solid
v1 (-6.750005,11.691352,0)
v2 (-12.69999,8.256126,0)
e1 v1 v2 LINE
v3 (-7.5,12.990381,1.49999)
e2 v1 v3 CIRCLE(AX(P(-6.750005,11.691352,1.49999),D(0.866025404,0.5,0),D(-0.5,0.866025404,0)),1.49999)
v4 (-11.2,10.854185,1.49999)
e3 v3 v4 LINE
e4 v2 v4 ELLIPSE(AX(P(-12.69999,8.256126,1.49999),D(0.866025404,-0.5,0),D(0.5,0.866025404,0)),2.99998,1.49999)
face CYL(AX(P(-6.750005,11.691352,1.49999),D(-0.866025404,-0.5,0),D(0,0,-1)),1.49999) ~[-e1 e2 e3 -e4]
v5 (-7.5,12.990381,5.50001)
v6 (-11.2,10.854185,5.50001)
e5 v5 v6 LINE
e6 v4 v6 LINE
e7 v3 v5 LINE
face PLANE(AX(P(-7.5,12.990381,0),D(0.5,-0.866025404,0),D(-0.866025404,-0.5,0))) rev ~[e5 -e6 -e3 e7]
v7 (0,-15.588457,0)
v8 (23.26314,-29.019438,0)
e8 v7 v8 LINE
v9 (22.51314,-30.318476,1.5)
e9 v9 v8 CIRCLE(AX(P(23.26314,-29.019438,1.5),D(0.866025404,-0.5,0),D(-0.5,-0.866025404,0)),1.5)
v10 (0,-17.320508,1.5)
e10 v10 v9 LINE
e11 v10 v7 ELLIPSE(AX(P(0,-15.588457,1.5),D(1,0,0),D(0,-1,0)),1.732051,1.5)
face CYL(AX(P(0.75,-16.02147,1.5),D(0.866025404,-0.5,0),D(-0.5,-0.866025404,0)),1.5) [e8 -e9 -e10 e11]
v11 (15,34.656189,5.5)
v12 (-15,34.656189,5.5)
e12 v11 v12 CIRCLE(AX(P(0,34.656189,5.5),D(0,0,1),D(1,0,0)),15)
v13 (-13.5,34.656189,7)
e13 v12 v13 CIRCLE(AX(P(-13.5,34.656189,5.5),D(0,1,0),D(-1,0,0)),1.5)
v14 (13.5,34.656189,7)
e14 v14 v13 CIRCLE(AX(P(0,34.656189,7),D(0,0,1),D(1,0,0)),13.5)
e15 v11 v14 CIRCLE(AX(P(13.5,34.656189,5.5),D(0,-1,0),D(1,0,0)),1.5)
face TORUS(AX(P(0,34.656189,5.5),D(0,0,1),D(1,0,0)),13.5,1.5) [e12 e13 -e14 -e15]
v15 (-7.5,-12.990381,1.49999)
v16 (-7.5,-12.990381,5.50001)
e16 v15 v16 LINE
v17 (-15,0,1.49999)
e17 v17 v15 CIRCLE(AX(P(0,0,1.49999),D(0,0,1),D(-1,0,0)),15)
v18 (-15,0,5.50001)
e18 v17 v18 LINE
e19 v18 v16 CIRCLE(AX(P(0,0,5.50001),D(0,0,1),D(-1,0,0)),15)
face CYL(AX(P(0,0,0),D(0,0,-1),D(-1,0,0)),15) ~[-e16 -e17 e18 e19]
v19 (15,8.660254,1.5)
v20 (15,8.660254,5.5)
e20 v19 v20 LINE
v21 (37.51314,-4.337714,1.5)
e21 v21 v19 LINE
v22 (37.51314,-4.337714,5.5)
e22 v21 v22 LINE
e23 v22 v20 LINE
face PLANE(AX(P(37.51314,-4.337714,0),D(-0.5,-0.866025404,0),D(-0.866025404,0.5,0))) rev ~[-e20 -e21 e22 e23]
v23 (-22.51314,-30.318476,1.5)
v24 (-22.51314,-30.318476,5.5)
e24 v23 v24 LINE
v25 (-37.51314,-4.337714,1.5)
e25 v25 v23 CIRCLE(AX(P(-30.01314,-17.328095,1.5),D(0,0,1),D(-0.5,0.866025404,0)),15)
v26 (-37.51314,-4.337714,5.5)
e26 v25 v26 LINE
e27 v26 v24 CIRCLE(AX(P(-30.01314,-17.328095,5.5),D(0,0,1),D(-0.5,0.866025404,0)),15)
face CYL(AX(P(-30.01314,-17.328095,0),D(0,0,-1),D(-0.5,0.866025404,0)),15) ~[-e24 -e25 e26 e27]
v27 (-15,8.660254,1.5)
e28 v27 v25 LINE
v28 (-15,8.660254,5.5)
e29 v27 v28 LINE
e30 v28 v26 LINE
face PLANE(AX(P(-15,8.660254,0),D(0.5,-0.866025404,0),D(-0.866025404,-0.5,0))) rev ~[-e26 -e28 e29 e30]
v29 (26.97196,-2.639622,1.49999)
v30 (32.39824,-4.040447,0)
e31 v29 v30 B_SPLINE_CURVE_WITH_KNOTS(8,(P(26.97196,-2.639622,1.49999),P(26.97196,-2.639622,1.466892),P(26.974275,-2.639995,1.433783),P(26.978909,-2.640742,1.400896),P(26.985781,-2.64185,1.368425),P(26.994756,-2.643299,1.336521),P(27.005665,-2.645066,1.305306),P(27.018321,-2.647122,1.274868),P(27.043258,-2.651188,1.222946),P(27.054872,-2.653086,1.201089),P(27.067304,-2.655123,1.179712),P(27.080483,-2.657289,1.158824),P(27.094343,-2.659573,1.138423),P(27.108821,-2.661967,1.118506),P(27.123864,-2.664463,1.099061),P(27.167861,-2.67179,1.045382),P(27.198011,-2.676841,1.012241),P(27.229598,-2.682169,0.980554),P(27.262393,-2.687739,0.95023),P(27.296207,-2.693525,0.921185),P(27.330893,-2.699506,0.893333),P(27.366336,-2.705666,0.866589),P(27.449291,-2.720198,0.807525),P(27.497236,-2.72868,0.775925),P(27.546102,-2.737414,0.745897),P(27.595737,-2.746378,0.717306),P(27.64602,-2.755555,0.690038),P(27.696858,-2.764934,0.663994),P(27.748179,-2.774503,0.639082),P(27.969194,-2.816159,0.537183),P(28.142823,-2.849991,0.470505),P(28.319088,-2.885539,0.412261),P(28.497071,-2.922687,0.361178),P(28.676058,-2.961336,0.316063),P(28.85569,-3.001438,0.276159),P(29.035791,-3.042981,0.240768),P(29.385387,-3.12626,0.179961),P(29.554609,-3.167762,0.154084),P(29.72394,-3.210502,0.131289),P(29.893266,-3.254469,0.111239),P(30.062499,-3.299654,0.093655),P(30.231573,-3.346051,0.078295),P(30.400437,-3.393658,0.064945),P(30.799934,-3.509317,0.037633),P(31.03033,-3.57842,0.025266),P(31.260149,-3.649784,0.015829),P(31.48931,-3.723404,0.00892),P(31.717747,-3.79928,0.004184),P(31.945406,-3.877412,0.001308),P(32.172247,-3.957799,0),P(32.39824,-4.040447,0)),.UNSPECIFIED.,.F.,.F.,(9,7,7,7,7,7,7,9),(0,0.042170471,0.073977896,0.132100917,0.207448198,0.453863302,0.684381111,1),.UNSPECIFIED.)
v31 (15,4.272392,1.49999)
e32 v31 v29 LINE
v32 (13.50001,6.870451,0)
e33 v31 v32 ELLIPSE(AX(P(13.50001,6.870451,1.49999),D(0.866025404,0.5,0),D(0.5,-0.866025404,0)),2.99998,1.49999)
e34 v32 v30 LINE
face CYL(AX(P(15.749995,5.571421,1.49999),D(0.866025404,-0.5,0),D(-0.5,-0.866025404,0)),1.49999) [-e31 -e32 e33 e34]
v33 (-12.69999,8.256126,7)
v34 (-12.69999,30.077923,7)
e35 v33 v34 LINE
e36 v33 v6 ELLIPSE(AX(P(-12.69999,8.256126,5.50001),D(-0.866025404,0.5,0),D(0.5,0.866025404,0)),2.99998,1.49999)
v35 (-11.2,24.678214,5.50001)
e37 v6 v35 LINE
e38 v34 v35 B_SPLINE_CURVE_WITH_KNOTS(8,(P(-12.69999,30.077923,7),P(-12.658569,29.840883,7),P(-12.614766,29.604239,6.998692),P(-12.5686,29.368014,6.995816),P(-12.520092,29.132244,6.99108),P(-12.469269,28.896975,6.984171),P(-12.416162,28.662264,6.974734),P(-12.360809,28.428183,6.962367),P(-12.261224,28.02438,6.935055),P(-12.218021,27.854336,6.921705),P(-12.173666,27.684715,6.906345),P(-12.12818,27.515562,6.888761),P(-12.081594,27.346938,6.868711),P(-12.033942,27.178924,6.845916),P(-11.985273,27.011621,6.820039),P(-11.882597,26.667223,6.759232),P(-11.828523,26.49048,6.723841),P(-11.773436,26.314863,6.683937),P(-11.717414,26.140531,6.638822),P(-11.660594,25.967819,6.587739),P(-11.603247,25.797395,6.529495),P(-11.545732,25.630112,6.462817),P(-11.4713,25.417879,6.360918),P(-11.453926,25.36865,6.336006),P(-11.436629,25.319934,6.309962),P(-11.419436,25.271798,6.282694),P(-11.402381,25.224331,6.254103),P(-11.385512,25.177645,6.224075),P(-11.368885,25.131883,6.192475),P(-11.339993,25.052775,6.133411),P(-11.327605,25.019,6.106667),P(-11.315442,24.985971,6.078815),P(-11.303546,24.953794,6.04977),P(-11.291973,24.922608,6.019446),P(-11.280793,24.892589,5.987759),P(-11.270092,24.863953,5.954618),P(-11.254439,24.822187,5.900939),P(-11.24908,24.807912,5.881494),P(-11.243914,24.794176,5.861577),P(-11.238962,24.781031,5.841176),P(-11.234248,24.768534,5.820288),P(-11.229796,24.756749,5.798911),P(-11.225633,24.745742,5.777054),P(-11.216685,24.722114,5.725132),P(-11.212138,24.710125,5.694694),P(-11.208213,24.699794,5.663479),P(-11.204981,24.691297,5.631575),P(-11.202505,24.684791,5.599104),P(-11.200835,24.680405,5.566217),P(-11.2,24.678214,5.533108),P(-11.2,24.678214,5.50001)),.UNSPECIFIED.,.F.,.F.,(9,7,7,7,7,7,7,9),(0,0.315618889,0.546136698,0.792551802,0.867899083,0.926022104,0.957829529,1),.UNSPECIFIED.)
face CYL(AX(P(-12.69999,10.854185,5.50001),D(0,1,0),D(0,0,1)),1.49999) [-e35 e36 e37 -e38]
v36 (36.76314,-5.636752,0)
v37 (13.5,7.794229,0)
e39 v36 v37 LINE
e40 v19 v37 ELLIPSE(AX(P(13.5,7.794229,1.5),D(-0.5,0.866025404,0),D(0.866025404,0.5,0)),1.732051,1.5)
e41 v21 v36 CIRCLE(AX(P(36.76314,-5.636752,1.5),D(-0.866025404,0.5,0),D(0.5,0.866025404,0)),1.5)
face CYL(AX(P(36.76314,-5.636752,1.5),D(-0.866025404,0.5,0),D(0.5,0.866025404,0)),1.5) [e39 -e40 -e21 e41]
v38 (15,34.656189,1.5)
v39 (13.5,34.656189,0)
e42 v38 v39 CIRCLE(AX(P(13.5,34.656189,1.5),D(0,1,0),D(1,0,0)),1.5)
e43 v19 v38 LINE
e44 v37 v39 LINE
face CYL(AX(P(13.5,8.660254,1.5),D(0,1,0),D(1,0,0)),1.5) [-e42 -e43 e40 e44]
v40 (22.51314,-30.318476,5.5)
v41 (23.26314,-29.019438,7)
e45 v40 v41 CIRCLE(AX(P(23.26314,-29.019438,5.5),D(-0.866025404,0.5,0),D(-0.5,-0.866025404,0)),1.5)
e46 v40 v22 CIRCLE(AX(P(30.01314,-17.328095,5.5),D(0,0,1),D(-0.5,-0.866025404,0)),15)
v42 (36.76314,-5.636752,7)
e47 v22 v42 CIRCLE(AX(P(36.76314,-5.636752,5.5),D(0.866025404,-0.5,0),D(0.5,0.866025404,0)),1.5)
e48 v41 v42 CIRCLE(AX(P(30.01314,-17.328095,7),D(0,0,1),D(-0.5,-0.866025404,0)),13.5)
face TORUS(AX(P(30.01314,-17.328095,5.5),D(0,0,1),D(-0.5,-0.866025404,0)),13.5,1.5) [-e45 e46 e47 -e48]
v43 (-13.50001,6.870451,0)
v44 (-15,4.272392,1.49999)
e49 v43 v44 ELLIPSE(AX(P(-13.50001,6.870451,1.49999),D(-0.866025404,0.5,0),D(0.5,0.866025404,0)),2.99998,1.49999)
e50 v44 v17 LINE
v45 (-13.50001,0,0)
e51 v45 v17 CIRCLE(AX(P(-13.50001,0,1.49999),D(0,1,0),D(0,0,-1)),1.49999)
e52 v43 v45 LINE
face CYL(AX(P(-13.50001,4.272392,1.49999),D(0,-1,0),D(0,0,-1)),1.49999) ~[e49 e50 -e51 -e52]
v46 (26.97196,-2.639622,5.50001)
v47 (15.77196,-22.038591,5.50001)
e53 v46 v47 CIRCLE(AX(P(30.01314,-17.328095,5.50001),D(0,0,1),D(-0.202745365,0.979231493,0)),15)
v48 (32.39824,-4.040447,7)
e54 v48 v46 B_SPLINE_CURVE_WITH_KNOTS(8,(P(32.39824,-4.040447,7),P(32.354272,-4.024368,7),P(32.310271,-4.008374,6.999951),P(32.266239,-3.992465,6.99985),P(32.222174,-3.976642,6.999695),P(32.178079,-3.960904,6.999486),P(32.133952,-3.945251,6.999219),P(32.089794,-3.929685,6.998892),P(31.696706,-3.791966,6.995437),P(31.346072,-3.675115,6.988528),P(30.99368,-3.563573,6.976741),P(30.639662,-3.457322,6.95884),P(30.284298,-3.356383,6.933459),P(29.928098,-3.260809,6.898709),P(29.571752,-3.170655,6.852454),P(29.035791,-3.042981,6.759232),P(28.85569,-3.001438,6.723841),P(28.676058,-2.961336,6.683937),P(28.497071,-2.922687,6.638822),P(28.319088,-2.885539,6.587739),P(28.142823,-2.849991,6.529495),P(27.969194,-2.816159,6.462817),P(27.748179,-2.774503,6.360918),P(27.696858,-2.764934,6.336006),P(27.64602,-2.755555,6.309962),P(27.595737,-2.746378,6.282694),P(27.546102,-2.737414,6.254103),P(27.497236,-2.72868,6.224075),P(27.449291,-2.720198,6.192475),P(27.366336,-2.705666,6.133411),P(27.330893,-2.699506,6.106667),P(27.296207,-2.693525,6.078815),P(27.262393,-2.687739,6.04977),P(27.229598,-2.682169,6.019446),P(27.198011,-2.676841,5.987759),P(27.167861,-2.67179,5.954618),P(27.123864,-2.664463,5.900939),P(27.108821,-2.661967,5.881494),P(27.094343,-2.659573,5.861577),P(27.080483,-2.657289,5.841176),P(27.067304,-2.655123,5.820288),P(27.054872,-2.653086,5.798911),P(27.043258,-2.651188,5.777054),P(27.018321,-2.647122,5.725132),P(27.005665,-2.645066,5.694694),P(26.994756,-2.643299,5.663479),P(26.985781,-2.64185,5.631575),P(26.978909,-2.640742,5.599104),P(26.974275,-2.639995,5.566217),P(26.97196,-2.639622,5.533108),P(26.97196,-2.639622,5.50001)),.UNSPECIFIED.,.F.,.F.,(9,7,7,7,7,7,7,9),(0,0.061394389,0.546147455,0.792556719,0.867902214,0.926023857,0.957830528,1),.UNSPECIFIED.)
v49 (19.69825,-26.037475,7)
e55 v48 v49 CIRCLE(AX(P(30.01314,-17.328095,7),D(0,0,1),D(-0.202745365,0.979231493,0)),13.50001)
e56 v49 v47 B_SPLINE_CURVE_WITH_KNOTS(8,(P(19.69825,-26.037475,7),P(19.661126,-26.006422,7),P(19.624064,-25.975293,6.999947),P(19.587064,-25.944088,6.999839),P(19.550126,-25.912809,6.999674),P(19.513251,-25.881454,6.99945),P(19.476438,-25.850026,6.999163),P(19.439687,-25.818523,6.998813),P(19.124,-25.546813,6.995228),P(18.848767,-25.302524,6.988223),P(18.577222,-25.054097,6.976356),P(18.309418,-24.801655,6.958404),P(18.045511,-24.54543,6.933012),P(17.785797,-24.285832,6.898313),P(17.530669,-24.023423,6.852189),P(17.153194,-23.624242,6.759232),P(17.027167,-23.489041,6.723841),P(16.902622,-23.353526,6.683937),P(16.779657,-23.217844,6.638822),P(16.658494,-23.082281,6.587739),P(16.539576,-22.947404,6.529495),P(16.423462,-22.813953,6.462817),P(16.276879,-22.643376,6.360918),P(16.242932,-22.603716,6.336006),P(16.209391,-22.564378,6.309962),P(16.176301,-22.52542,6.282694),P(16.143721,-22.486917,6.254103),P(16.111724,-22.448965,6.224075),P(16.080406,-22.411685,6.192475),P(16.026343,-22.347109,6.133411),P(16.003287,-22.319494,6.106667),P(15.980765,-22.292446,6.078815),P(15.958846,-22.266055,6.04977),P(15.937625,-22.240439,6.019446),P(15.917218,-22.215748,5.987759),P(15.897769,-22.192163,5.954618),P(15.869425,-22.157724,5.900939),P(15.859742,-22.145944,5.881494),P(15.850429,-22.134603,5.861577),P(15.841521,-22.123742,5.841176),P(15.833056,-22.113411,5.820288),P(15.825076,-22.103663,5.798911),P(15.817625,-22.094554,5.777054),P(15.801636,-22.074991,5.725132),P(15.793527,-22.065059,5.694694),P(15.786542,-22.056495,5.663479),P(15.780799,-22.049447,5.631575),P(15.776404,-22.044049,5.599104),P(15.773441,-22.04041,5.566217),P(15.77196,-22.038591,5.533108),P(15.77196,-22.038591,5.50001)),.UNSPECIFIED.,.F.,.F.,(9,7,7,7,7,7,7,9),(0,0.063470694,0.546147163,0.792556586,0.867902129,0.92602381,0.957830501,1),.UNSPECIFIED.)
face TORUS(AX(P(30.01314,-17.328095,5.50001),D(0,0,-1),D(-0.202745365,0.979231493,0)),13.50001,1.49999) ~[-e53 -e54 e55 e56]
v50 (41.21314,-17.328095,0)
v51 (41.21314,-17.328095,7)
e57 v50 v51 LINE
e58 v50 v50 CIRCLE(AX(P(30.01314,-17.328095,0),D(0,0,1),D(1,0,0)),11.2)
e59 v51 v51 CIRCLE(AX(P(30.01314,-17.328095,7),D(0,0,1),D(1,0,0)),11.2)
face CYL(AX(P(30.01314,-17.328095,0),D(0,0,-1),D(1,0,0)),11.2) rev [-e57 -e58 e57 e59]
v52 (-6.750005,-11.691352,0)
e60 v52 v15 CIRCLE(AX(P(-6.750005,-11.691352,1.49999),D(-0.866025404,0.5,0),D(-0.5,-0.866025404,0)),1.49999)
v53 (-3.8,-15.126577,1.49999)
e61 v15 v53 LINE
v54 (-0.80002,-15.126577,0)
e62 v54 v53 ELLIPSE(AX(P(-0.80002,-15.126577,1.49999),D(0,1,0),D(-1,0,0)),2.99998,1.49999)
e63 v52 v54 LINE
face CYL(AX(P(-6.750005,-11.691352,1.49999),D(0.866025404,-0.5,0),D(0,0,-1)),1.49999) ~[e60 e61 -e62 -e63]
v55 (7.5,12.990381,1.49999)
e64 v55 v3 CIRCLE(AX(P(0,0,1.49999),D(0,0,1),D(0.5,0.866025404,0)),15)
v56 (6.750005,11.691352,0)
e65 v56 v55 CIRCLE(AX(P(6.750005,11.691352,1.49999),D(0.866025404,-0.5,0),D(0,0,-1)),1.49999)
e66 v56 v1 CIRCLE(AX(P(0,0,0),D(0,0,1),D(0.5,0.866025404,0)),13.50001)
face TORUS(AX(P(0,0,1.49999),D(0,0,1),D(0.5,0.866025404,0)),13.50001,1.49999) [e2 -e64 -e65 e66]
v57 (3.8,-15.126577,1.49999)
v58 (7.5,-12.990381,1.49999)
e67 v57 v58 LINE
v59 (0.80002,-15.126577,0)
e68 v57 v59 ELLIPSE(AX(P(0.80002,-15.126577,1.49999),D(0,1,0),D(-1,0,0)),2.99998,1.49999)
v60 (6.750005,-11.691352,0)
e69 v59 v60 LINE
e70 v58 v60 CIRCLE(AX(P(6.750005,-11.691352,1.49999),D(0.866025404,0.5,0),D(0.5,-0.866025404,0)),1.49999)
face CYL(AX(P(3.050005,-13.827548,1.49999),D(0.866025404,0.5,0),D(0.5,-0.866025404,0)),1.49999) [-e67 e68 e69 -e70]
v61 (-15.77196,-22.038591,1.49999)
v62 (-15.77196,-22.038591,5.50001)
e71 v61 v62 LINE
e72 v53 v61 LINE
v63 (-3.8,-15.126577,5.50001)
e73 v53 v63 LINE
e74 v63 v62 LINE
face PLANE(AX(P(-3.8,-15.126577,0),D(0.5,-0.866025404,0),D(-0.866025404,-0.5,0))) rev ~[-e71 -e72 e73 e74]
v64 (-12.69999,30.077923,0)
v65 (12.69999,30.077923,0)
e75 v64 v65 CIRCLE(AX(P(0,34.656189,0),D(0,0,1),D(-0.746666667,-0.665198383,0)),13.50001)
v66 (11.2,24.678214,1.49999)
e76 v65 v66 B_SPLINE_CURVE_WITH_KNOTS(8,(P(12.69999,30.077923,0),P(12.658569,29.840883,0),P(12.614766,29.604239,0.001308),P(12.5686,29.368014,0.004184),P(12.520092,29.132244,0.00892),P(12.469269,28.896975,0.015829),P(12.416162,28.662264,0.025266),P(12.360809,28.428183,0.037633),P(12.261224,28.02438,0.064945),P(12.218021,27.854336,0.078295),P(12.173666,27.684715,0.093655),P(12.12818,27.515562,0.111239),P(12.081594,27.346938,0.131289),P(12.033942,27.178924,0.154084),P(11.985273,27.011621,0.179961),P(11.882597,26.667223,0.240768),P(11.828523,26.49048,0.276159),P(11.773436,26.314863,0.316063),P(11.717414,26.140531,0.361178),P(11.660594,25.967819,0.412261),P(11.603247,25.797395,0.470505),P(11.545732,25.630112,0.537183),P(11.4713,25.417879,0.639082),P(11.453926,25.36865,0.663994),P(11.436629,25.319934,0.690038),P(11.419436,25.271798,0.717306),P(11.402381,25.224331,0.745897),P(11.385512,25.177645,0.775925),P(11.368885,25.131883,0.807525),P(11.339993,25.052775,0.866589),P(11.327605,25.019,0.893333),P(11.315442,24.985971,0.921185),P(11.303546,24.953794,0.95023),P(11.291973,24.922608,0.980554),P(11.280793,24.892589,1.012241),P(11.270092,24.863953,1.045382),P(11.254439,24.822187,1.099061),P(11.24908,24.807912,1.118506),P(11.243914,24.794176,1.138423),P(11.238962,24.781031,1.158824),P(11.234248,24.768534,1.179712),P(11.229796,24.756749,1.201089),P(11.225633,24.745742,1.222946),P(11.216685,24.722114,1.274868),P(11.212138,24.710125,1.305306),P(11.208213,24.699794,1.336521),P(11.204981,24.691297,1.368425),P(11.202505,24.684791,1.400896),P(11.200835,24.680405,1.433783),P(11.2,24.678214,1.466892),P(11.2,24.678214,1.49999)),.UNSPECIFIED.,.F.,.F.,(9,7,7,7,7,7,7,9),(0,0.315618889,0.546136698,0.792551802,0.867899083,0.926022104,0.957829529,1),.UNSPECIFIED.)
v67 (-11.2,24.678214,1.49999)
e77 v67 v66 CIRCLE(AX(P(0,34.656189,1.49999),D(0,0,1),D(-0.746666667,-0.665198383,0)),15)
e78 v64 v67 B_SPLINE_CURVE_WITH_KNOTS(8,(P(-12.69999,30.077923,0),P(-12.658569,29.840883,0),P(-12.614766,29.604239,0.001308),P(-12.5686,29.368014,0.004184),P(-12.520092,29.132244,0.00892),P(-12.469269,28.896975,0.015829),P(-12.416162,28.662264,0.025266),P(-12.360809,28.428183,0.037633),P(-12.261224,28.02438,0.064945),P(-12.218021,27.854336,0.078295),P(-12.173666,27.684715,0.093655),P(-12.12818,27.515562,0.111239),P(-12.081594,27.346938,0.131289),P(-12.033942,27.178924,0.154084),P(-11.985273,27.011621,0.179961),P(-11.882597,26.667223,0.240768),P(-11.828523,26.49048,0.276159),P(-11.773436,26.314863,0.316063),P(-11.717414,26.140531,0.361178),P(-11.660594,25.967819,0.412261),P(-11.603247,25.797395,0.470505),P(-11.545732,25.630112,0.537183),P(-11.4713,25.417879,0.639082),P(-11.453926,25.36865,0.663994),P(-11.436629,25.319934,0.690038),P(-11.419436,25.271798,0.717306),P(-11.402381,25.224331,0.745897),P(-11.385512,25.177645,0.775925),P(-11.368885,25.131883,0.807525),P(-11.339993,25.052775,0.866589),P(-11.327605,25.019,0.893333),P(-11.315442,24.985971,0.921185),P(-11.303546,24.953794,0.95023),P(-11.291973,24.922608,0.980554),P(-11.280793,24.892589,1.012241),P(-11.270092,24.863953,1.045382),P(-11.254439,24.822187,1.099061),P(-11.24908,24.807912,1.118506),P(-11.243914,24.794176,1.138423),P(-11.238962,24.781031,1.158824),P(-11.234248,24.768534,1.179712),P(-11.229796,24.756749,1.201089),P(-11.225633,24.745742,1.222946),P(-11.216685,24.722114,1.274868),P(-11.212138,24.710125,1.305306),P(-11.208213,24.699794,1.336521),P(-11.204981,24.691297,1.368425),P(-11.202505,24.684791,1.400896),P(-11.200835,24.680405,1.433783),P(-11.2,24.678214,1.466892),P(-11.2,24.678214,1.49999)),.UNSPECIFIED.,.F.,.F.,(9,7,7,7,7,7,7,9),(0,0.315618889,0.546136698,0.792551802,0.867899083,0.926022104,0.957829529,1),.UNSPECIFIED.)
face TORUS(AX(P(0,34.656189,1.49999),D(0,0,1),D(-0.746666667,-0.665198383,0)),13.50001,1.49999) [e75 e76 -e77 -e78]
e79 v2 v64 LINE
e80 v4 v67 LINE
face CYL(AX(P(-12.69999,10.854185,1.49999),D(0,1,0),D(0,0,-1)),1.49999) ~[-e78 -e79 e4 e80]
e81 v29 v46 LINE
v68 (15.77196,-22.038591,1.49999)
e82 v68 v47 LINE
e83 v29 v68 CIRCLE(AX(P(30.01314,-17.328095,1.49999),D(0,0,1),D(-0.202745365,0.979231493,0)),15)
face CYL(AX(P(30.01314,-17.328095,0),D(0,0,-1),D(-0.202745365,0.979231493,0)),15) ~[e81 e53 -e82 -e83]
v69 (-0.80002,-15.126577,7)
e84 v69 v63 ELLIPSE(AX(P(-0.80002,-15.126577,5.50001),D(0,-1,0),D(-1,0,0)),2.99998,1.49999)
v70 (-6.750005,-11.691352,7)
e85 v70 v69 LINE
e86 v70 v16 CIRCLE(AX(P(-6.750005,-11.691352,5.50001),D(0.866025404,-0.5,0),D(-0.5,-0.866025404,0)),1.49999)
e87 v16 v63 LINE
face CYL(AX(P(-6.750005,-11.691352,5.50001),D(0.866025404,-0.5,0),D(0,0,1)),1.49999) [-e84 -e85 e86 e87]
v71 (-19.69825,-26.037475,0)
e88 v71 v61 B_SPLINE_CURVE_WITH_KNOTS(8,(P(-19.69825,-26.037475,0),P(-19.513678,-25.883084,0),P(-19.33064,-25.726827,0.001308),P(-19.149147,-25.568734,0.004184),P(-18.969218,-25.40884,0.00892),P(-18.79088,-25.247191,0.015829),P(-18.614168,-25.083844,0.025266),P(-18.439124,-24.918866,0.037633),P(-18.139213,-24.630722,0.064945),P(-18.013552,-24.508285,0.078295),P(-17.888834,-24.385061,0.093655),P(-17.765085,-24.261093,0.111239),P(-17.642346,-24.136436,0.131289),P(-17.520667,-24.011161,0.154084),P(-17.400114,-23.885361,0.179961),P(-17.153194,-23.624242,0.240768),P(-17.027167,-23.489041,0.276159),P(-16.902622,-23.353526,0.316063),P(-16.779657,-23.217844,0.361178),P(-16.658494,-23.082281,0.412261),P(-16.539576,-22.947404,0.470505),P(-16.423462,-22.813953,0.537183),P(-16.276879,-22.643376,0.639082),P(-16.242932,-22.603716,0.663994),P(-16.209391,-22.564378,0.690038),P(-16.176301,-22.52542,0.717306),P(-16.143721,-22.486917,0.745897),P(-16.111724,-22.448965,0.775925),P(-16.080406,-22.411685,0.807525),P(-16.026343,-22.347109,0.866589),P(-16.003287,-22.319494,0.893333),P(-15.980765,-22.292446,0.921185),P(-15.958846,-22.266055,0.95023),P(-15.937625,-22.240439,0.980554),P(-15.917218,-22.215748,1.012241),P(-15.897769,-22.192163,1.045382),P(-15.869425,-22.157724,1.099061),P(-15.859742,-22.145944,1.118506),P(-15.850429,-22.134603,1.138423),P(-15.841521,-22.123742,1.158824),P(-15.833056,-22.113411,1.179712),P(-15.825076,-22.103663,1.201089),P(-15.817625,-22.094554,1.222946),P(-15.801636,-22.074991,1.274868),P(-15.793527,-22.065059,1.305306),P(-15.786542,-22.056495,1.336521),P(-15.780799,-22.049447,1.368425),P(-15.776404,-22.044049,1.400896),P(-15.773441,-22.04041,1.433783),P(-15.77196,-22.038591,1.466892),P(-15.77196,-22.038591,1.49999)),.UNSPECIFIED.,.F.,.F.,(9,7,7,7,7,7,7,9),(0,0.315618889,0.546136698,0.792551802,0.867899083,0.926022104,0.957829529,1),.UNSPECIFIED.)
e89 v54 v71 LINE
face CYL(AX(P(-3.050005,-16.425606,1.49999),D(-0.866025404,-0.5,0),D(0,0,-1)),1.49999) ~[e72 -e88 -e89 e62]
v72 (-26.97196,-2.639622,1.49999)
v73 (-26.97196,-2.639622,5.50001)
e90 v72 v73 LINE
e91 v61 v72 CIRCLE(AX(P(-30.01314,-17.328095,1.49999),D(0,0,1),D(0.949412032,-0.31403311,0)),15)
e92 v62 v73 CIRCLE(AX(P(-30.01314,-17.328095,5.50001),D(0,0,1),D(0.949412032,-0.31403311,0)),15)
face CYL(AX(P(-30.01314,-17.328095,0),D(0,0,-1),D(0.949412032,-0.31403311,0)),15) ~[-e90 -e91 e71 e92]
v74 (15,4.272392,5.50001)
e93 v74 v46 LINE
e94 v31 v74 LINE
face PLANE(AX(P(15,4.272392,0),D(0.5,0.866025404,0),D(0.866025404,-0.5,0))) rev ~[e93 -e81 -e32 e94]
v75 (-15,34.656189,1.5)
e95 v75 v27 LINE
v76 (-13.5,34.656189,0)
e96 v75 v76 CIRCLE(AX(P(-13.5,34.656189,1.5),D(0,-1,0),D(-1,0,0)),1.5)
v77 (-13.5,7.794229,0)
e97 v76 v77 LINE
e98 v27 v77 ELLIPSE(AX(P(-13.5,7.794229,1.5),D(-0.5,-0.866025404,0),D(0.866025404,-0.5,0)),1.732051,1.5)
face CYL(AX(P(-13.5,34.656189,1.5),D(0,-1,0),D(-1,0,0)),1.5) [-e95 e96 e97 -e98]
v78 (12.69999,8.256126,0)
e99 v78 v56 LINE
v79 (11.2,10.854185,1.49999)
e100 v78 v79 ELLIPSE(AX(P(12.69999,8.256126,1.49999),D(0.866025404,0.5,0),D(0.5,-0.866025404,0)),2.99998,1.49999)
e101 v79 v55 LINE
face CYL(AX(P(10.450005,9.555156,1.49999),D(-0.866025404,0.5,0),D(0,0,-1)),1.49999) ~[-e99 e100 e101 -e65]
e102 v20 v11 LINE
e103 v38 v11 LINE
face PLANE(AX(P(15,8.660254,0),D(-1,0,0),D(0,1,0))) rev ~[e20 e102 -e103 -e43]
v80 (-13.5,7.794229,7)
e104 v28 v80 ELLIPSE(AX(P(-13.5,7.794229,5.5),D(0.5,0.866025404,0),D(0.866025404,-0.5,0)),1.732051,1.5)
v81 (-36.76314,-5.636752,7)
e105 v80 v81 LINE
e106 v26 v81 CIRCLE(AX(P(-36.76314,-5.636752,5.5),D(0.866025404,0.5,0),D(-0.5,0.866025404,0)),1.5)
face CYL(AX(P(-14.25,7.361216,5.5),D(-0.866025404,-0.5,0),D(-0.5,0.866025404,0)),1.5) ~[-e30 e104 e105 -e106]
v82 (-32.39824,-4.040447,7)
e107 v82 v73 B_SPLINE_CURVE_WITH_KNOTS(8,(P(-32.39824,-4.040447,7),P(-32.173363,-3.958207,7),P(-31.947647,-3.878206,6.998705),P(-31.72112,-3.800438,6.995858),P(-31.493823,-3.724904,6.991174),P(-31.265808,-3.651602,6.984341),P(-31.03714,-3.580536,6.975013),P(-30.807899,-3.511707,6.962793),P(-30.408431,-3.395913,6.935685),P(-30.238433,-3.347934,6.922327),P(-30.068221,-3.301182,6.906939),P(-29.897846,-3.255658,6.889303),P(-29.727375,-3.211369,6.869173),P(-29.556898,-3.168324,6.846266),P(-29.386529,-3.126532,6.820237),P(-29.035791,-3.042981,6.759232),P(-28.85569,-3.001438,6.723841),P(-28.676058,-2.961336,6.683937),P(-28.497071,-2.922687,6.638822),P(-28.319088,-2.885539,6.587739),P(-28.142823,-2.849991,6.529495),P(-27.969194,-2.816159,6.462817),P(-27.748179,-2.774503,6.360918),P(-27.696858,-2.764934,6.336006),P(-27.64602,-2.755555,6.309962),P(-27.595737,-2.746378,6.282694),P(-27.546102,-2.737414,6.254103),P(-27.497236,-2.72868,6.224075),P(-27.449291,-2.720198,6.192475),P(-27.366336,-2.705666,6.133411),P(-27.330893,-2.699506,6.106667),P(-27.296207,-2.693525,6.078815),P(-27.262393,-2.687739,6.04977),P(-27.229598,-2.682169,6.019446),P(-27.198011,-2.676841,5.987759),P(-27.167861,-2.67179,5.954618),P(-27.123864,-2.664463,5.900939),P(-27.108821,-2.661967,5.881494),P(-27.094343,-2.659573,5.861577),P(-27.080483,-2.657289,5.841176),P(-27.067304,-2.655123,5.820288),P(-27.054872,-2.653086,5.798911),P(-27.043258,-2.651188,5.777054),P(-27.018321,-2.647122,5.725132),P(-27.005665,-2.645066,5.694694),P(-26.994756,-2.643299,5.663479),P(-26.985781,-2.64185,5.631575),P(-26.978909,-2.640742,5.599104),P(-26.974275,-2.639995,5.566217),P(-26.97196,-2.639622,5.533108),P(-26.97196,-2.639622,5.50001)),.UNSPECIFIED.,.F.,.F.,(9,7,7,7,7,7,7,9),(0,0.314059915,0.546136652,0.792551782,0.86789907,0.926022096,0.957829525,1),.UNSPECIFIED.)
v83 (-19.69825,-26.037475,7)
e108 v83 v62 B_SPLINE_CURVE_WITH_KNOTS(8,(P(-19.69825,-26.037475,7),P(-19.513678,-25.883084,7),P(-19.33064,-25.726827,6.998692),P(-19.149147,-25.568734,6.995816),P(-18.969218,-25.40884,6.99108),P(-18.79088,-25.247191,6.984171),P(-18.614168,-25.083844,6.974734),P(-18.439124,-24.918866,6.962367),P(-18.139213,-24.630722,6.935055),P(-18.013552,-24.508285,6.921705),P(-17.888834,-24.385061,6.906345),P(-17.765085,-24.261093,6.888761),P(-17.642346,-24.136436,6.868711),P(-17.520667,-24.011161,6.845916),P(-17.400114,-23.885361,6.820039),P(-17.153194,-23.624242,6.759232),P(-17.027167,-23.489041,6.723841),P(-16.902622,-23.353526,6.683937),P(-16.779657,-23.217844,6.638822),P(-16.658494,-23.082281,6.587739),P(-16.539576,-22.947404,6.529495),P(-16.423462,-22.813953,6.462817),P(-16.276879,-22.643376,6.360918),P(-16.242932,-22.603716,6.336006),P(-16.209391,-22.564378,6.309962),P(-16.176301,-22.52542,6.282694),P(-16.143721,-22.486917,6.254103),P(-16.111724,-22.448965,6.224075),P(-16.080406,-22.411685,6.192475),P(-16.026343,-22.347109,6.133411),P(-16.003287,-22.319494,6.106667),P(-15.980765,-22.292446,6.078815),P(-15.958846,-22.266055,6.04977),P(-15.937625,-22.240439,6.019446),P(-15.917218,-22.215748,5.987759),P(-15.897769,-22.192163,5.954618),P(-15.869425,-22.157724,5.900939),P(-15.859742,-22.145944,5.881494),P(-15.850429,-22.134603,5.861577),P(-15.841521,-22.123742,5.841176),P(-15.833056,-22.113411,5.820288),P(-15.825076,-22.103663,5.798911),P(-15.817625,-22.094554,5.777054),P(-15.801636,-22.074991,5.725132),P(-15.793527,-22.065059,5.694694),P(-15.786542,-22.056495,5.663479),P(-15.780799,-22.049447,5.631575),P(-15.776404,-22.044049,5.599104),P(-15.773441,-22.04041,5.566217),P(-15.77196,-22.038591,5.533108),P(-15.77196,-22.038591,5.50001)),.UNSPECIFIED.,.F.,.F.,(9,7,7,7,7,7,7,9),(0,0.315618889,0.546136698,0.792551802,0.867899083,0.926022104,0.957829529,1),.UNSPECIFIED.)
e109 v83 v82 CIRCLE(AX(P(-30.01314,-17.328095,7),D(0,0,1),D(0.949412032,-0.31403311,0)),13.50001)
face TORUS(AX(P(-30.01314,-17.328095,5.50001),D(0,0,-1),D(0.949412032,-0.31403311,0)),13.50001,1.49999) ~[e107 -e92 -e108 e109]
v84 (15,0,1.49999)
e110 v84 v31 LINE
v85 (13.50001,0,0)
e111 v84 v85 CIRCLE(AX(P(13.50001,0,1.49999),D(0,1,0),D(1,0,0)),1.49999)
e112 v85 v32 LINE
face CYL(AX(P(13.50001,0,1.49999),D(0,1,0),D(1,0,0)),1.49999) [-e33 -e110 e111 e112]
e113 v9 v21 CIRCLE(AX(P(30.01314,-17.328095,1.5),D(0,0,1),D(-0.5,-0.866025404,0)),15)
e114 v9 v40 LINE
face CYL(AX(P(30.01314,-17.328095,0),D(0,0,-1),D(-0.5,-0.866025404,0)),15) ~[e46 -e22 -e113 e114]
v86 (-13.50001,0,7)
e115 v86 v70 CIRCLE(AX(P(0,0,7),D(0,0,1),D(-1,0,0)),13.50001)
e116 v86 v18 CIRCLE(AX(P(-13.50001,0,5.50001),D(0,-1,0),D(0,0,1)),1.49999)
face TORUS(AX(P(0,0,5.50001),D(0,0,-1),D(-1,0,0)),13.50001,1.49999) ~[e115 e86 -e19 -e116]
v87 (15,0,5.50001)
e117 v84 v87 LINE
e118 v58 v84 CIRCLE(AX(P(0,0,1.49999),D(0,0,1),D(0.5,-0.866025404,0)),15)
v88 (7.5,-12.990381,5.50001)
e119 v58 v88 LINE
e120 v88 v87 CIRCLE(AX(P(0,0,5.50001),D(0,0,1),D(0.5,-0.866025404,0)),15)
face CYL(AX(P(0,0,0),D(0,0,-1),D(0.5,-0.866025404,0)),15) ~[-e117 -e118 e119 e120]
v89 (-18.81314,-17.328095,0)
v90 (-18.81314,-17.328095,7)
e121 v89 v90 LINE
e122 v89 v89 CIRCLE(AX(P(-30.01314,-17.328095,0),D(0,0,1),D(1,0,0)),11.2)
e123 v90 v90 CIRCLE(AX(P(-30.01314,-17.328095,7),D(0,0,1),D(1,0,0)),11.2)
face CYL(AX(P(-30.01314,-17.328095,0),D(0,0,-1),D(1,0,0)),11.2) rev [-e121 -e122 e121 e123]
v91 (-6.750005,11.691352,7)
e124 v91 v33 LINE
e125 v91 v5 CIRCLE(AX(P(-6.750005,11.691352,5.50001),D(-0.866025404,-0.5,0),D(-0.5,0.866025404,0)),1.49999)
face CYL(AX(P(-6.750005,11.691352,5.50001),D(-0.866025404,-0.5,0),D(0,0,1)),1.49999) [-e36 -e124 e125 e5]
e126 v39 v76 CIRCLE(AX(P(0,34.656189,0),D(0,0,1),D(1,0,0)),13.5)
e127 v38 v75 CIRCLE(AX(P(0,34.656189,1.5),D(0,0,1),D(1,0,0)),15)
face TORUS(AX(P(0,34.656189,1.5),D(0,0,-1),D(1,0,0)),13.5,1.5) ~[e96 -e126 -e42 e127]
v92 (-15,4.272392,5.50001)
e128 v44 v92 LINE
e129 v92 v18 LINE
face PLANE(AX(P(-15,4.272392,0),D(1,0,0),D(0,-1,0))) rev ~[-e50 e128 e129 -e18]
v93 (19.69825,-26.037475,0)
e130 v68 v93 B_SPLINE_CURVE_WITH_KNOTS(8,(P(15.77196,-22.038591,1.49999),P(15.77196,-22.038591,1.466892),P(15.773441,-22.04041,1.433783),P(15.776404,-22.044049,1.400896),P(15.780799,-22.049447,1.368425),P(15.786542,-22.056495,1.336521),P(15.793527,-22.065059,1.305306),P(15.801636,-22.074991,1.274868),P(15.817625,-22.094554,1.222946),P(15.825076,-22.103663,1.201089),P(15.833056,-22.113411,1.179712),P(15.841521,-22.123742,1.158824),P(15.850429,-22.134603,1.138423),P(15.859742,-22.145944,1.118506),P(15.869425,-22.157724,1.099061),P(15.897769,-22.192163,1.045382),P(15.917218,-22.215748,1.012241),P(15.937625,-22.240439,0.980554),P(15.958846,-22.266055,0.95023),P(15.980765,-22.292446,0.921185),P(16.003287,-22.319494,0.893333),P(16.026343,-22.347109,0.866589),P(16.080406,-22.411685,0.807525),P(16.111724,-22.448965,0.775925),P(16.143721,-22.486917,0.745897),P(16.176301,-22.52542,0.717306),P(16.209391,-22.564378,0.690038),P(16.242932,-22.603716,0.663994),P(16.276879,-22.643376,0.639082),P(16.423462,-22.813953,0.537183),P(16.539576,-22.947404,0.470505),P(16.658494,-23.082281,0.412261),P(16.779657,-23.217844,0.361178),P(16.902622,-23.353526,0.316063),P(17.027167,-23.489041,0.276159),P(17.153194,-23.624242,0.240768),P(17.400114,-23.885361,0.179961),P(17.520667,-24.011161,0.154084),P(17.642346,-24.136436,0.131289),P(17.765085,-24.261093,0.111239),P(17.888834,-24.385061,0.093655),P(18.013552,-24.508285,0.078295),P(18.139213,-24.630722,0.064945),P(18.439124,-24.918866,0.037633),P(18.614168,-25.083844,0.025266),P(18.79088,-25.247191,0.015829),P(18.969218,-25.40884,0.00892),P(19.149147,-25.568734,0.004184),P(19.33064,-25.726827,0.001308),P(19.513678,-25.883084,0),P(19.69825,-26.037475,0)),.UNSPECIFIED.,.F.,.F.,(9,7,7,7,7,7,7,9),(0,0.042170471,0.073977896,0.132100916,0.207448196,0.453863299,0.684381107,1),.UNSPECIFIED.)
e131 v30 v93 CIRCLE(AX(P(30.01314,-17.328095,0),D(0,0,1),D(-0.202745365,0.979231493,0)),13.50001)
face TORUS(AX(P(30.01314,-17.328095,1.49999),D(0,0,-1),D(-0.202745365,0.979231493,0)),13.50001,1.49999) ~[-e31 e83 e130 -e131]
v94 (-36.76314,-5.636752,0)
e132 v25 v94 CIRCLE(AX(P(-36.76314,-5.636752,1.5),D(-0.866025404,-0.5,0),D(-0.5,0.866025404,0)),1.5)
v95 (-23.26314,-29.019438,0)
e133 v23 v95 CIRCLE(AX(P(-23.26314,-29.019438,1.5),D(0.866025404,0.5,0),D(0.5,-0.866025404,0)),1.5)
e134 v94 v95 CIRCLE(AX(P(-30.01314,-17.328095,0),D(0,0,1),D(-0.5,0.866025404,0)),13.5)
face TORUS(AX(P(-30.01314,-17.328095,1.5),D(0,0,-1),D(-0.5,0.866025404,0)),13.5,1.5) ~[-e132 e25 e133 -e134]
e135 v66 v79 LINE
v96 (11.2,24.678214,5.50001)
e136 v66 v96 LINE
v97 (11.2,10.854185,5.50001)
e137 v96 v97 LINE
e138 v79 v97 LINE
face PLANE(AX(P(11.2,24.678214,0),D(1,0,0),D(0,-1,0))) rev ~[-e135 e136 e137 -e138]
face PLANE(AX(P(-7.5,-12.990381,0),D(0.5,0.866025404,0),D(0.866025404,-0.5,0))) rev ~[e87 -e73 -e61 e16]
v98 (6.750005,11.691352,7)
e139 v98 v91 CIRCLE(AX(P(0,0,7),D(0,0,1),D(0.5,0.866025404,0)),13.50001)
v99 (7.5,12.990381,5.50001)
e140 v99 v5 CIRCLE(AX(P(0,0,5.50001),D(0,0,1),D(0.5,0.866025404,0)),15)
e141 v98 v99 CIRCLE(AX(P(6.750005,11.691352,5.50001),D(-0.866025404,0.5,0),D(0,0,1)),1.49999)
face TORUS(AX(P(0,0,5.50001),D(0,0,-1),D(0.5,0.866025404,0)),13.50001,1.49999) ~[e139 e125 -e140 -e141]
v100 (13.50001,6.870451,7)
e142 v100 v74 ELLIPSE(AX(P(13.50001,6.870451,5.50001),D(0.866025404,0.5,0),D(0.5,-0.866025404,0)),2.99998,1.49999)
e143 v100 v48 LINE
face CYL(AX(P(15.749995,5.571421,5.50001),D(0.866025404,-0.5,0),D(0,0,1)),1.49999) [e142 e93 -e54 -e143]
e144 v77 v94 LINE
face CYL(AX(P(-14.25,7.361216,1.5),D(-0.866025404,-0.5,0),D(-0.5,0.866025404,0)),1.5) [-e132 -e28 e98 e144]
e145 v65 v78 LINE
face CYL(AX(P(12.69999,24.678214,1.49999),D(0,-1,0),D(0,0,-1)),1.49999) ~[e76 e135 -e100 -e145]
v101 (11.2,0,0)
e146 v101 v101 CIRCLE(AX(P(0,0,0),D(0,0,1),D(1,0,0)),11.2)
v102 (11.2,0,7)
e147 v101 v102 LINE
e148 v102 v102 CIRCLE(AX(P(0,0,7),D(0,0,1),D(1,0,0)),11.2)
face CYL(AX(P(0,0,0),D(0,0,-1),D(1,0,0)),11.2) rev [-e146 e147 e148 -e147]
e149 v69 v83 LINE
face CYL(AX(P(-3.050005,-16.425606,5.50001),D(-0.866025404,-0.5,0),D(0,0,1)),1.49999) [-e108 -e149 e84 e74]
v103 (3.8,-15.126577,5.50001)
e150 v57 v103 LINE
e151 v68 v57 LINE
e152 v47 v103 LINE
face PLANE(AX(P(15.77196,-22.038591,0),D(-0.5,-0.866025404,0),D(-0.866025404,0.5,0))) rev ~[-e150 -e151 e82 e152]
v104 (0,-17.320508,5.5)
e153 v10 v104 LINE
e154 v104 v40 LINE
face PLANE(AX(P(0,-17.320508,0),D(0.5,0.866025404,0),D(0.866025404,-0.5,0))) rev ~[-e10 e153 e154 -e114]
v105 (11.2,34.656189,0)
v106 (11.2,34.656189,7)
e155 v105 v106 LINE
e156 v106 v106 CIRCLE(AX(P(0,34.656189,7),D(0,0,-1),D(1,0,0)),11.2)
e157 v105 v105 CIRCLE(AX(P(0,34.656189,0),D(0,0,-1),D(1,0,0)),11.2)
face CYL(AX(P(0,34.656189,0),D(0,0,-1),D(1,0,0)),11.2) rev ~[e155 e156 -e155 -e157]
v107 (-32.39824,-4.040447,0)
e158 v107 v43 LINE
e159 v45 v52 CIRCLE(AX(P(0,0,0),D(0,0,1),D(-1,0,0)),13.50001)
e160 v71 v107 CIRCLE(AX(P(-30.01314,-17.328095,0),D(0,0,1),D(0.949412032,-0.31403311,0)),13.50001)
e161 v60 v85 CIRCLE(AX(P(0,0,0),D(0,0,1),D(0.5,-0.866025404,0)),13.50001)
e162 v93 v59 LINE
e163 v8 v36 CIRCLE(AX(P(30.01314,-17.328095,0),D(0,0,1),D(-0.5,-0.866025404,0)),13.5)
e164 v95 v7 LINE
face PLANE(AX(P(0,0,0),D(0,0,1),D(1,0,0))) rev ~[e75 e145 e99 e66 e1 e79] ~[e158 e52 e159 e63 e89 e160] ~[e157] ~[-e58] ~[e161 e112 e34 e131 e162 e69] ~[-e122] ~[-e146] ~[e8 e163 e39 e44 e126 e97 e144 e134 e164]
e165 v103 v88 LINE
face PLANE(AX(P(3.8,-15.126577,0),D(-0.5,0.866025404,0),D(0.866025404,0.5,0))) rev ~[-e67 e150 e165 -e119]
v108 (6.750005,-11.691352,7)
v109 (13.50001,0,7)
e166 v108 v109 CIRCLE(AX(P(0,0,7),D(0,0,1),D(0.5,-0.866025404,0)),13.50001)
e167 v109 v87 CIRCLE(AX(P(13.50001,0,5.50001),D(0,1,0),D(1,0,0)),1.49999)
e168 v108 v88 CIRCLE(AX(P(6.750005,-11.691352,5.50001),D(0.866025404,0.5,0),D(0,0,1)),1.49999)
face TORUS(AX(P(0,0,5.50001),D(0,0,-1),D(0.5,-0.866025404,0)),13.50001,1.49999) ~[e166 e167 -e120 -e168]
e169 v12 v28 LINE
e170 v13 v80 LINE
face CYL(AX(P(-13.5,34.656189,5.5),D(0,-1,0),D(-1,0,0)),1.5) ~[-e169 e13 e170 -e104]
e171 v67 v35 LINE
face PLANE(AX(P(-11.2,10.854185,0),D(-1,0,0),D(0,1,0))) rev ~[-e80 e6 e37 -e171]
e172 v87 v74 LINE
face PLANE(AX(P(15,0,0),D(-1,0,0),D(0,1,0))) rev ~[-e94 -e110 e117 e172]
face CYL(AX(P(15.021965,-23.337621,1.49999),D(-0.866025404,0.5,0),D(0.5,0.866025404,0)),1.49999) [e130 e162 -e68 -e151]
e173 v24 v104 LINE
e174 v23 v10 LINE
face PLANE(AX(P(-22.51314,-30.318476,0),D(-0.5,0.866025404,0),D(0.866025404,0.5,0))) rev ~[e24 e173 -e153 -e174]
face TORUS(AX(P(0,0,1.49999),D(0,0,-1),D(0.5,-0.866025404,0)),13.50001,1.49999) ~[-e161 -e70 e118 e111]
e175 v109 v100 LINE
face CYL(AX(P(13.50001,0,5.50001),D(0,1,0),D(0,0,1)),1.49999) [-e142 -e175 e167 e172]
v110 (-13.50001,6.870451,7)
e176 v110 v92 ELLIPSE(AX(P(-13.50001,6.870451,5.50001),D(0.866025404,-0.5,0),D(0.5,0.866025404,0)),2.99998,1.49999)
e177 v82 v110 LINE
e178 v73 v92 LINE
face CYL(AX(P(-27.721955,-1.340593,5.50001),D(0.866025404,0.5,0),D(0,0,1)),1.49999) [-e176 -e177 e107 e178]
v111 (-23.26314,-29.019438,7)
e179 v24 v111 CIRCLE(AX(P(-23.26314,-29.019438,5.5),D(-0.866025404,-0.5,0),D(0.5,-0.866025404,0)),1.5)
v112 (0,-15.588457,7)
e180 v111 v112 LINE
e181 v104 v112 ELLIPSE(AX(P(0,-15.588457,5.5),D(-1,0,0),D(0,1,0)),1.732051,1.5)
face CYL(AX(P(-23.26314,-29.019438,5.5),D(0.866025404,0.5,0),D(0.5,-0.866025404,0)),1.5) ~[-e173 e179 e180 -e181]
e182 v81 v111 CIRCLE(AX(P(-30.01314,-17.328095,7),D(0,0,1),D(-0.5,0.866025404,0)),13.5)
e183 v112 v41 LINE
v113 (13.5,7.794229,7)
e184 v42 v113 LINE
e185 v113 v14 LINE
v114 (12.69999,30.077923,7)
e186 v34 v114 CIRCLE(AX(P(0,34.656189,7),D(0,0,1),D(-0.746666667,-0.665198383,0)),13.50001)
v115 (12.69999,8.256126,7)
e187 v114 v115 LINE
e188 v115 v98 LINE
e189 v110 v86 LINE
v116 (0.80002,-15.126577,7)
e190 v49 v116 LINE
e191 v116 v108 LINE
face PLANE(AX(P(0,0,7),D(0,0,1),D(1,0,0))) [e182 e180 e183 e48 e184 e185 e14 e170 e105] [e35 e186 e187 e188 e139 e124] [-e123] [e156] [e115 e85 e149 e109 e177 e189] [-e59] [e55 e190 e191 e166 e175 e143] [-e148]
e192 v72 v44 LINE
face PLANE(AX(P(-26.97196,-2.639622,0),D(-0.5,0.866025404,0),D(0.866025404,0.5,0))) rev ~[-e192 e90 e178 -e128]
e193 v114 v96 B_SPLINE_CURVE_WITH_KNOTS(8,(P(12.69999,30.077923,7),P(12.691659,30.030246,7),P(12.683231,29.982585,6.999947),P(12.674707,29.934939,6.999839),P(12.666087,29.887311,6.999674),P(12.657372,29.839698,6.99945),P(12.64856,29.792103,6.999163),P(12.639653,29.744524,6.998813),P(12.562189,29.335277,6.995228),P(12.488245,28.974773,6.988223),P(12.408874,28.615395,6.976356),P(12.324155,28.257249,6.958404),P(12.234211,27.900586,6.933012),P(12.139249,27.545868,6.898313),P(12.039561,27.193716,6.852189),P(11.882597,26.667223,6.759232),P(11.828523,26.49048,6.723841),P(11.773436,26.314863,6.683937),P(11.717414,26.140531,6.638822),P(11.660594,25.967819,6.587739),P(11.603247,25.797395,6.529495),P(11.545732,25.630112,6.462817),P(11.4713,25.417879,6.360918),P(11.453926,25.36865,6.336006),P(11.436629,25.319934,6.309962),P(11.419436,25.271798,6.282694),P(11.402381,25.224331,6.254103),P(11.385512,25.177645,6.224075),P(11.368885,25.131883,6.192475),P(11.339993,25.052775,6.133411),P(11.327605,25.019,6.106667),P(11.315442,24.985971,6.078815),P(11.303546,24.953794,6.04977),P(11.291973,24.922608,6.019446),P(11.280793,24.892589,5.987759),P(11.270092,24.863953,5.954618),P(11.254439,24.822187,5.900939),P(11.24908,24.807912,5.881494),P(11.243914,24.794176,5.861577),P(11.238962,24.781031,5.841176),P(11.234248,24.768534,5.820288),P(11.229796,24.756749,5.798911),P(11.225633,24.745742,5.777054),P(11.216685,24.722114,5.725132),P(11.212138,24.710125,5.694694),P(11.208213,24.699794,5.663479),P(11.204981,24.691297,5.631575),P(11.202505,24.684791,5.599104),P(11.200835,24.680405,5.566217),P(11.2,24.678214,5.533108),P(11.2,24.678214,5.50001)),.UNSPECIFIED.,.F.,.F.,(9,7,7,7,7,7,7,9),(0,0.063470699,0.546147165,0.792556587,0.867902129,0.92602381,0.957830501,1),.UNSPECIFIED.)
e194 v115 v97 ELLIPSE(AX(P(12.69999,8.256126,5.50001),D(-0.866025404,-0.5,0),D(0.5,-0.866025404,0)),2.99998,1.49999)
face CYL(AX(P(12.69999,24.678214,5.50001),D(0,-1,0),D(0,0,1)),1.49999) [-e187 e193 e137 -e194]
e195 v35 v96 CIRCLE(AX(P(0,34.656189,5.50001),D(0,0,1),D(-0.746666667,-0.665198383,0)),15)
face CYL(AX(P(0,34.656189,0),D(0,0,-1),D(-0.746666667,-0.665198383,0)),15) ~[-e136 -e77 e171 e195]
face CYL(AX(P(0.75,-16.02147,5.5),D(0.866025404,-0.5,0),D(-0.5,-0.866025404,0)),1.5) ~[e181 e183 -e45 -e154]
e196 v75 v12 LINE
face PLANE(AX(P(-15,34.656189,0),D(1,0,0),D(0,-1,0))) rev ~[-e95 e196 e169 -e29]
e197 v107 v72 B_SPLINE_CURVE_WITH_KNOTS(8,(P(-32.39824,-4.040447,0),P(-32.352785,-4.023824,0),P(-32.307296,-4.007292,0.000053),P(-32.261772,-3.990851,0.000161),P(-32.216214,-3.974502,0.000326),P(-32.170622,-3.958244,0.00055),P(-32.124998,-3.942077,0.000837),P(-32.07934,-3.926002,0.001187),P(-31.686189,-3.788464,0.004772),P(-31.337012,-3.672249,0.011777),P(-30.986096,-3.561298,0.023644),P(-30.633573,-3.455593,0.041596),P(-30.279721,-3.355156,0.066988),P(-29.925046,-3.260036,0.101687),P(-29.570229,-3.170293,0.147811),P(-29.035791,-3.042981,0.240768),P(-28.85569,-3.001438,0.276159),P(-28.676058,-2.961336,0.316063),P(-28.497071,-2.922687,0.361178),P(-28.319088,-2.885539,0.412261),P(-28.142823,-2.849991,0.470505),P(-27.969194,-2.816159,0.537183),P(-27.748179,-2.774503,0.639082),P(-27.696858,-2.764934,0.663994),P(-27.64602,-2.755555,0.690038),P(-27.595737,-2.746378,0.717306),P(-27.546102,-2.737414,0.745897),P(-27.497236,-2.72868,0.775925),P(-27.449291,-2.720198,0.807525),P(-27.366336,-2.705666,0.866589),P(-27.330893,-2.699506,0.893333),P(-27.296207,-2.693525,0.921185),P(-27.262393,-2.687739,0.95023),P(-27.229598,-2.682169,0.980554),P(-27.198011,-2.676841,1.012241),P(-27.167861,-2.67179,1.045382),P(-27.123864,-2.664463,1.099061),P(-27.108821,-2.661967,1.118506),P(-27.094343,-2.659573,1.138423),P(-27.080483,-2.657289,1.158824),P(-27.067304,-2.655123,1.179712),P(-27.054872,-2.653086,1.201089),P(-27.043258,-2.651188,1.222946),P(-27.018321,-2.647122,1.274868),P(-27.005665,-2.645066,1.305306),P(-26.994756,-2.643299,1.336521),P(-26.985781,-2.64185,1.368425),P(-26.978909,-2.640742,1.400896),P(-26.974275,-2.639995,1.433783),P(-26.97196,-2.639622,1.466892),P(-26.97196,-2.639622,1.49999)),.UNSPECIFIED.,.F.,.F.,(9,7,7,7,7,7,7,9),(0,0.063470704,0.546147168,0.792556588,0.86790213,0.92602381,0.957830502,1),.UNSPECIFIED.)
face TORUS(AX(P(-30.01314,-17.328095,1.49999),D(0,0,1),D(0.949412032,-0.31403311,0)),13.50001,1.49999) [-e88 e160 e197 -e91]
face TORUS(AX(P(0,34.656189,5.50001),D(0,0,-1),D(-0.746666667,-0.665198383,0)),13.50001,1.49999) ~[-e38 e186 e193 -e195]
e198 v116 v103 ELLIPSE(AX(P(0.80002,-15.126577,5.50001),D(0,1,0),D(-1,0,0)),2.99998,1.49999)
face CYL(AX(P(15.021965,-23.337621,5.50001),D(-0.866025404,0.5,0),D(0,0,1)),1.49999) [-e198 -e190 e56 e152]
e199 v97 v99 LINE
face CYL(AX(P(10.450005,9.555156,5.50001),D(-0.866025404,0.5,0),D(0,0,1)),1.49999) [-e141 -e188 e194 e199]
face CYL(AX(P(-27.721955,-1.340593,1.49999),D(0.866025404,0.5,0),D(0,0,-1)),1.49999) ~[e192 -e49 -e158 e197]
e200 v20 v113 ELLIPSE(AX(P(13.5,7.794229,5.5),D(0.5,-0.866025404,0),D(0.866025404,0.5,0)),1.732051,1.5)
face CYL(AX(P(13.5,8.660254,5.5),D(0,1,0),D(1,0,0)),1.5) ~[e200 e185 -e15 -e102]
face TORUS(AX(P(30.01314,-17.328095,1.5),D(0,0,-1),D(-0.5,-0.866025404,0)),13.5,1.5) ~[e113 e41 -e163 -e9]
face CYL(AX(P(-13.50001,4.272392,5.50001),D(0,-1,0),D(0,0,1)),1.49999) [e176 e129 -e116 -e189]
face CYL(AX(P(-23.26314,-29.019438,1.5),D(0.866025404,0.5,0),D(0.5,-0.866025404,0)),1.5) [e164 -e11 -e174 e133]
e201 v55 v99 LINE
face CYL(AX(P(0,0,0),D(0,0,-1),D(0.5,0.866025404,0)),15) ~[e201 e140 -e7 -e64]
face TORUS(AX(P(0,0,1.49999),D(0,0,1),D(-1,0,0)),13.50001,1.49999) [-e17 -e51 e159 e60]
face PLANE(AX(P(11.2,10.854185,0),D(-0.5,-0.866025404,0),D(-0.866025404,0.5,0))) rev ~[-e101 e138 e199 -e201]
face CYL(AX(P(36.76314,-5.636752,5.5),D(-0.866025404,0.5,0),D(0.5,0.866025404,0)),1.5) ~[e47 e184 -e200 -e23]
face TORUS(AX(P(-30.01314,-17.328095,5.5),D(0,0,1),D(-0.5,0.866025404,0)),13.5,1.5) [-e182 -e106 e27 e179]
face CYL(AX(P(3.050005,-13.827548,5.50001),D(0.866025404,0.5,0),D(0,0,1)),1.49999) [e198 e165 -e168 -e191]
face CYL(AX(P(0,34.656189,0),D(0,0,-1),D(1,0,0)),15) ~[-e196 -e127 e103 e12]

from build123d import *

# Parameters (mm, degrees)
F0_R     = 11.2
F1_DEPTH = 7
F2_R     = 1.5
F3_R     = 1.49999
F4_R     = 1.49999


# Not quite as in the source:
# - a fillet or chamfer is up to 0.001 mm smaller than in the source, because OpenCascade refuses the exact size


with BuildPart() as f1:
    # F0 (on Top) → F1 (new body)
    with BuildSketch(Plane.XY):
        with BuildLine():
            Line((-15, 8.6602540378), (-37.5131404032, -4.3377136343))
            ThreePointArc((-37.5131404032, -4.3377136343), (-43.00352146, -24.828094691), (-22.5131404032, -30.3184757478))
            Line((-22.5131404032, -30.3184757478), (0, -17.3205080757))
            Line((0, -17.3205080757), (22.5131404032, -30.3184757478))
            ThreePointArc((22.5131404032, -30.3184757478), (43.00352146, -24.828094691), (37.5131404032, -4.3377136343))
            Line((37.5131404032, -4.3377136343), (15, 8.6602540378))
            Line((15, 8.6602540378), (15, 34.6561893821))
            ThreePointArc((15, 34.6561893821), (0, 49.6561893821), (-15, 34.6561893821))
            Line((-15, 34.6561893821), (-15, 8.6602540378))
        make_face()
        with Locations((-30.0131404032, -17.328094691)):
            Circle(F0_R, mode=Mode.SUBTRACT)
        with BuildLine():
            Line((-15, 4.272391992), (-15, 0))
            ThreePointArc((-15, 0), (-12.9903810568, -7.5), (-7.5, -12.9903810568))
            Line((-7.5, -12.9903810568), (-3.8, -15.1265770528))
            Line((-3.8, -15.1265770528), (-15.7719599283, -22.0385913401))
            ThreePointArc((-15.7719599283, -22.0385913401), (-17.0227593465, -9.828094691), (-26.9719599283, -2.6396222953))
            Line((-26.9719599283, -2.6396222953), (-15, 4.272391992))
        make_face(mode=Mode.SUBTRACT)
        with Locations((30.0131404032, -17.328094691)):
            Circle(F0_R, mode=Mode.SUBTRACT)
        with BuildLine():
            ThreePointArc((26.9719599283, -2.6396222953), (17.0227593465, -9.828094691), (15.7719599283, -22.0385913401))
            Line((15.7719599283, -22.0385913401), (3.8, -15.1265770528))
            Line((3.8, -15.1265770528), (7.5, -12.9903810568))
            ThreePointArc((7.5, -12.9903810568), (12.9903810568, -7.5), (15, 0))
            Line((15, 0), (15, 4.272391992))
            Line((15, 4.272391992), (26.9719599283, -2.6396222953))
        make_face(mode=Mode.SUBTRACT)
        Circle(F0_R, mode=Mode.SUBTRACT)
        with BuildLine():
            Line((-11.2, 10.8541850608), (-11.2, 24.6782136355))
            ThreePointArc((-11.2, 24.6782136355), (0, 19.6561893821), (11.2, 24.6782136355))
            Line((11.2, 24.6782136355), (11.2, 10.8541850608))
            Line((11.2, 10.8541850608), (7.5, 12.9903810568))
            ThreePointArc((7.5, 12.9903810568), (0, 15), (-7.5, 12.9903810568))
            Line((-7.5, 12.9903810568), (-11.2, 10.8541850608))
        make_face(mode=Mode.SUBTRACT)
        with BuildLine():
            ThreePointArc((-11.2, 34.6561893821), (0, 45.8561893821), (11.2, 34.6561893821))
            ThreePointArc((11.2, 34.6561893821), (0, 23.4561893821), (-11.2, 34.6561893821))
        make_face(mode=Mode.SUBTRACT)
    extrude(amount=F1_DEPTH)

    # F2
    f2_edges = [f1.edges().sort_by_distance(p)[0] for p in [
        (-15, 21.658222, 7),
        (-26.25657, 2.16127, 7),
        (11.25657, -23.819492, 7),
        (15, 21.658222, 0),
        (26.25657, 2.16127, 0),
        (-11.25657, -23.819492, 0),
    ]]
    fillet(f2_edges, radius=F2_R)

    # F3 (radius 1.5 in the source; OpenCascade refuses exactly that, so slightly less here)
    f3_edges = [f1.edges().sort_by_distance(p)[0] for p in [
        (17.022759, -9.828095, 7),
        (9.78598, -18.582584, 7),
        (20.98598, 0.816385, 7),
        (12.990381, -7.5, 7),
        (5.65, -14.058479, 7),
        (15, 2.136196, 7),
        (-20.98598, 0.816385, 7),
        (-17.022759, -9.828095, 7),
        (-9.78598, -18.582584, 7),
        (-12.990381, -7.5, 7),
        (-5.65, -14.058479, 7),
        (-15, 2.136196, 7),
        (0, 19.656189, 7),
        (-11.2, 17.766199, 7),
        (11.2, 17.766199, 7),
        (0, 15, 7),
        (9.35, 11.922283, 7),
        (-9.35, 11.922283, 7),
    ]]
    fillet(f3_edges, radius=F3_R)

    # F4 (radius 1.5 in the source; OpenCascade refuses exactly that, so slightly less here)
    f4_edges = [f1.edges().sort_by_distance(p)[0] for p in [
        (-17.022759, -9.828095, 0),
        (-9.78598, -18.582584, 0),
        (-20.98598, 0.816385, 0),
        (-11.2, 17.766199, 0),
        (0, 19.656189, 0),
        (11.2, 17.766199, 0),
        (17.022759, -9.828095, 0),
        (20.98598, 0.816385, 0),
        (9.78598, -18.582584, 0),
        (-12.990381, -7.5, 0),
        (-5.65, -14.058479, 0),
        (-15, 2.136196, 0),
        (-9.35, 11.922283, 0),
        (0, 15, 0),
        (9.35, 11.922283, 0),
        (15, 2.136196, 0),
        (12.990381, -7.5, 0),
        (5.65, -14.058479, 0),
    ]]
    fillet(f4_edges, radius=F4_R)


solid = f1.part
